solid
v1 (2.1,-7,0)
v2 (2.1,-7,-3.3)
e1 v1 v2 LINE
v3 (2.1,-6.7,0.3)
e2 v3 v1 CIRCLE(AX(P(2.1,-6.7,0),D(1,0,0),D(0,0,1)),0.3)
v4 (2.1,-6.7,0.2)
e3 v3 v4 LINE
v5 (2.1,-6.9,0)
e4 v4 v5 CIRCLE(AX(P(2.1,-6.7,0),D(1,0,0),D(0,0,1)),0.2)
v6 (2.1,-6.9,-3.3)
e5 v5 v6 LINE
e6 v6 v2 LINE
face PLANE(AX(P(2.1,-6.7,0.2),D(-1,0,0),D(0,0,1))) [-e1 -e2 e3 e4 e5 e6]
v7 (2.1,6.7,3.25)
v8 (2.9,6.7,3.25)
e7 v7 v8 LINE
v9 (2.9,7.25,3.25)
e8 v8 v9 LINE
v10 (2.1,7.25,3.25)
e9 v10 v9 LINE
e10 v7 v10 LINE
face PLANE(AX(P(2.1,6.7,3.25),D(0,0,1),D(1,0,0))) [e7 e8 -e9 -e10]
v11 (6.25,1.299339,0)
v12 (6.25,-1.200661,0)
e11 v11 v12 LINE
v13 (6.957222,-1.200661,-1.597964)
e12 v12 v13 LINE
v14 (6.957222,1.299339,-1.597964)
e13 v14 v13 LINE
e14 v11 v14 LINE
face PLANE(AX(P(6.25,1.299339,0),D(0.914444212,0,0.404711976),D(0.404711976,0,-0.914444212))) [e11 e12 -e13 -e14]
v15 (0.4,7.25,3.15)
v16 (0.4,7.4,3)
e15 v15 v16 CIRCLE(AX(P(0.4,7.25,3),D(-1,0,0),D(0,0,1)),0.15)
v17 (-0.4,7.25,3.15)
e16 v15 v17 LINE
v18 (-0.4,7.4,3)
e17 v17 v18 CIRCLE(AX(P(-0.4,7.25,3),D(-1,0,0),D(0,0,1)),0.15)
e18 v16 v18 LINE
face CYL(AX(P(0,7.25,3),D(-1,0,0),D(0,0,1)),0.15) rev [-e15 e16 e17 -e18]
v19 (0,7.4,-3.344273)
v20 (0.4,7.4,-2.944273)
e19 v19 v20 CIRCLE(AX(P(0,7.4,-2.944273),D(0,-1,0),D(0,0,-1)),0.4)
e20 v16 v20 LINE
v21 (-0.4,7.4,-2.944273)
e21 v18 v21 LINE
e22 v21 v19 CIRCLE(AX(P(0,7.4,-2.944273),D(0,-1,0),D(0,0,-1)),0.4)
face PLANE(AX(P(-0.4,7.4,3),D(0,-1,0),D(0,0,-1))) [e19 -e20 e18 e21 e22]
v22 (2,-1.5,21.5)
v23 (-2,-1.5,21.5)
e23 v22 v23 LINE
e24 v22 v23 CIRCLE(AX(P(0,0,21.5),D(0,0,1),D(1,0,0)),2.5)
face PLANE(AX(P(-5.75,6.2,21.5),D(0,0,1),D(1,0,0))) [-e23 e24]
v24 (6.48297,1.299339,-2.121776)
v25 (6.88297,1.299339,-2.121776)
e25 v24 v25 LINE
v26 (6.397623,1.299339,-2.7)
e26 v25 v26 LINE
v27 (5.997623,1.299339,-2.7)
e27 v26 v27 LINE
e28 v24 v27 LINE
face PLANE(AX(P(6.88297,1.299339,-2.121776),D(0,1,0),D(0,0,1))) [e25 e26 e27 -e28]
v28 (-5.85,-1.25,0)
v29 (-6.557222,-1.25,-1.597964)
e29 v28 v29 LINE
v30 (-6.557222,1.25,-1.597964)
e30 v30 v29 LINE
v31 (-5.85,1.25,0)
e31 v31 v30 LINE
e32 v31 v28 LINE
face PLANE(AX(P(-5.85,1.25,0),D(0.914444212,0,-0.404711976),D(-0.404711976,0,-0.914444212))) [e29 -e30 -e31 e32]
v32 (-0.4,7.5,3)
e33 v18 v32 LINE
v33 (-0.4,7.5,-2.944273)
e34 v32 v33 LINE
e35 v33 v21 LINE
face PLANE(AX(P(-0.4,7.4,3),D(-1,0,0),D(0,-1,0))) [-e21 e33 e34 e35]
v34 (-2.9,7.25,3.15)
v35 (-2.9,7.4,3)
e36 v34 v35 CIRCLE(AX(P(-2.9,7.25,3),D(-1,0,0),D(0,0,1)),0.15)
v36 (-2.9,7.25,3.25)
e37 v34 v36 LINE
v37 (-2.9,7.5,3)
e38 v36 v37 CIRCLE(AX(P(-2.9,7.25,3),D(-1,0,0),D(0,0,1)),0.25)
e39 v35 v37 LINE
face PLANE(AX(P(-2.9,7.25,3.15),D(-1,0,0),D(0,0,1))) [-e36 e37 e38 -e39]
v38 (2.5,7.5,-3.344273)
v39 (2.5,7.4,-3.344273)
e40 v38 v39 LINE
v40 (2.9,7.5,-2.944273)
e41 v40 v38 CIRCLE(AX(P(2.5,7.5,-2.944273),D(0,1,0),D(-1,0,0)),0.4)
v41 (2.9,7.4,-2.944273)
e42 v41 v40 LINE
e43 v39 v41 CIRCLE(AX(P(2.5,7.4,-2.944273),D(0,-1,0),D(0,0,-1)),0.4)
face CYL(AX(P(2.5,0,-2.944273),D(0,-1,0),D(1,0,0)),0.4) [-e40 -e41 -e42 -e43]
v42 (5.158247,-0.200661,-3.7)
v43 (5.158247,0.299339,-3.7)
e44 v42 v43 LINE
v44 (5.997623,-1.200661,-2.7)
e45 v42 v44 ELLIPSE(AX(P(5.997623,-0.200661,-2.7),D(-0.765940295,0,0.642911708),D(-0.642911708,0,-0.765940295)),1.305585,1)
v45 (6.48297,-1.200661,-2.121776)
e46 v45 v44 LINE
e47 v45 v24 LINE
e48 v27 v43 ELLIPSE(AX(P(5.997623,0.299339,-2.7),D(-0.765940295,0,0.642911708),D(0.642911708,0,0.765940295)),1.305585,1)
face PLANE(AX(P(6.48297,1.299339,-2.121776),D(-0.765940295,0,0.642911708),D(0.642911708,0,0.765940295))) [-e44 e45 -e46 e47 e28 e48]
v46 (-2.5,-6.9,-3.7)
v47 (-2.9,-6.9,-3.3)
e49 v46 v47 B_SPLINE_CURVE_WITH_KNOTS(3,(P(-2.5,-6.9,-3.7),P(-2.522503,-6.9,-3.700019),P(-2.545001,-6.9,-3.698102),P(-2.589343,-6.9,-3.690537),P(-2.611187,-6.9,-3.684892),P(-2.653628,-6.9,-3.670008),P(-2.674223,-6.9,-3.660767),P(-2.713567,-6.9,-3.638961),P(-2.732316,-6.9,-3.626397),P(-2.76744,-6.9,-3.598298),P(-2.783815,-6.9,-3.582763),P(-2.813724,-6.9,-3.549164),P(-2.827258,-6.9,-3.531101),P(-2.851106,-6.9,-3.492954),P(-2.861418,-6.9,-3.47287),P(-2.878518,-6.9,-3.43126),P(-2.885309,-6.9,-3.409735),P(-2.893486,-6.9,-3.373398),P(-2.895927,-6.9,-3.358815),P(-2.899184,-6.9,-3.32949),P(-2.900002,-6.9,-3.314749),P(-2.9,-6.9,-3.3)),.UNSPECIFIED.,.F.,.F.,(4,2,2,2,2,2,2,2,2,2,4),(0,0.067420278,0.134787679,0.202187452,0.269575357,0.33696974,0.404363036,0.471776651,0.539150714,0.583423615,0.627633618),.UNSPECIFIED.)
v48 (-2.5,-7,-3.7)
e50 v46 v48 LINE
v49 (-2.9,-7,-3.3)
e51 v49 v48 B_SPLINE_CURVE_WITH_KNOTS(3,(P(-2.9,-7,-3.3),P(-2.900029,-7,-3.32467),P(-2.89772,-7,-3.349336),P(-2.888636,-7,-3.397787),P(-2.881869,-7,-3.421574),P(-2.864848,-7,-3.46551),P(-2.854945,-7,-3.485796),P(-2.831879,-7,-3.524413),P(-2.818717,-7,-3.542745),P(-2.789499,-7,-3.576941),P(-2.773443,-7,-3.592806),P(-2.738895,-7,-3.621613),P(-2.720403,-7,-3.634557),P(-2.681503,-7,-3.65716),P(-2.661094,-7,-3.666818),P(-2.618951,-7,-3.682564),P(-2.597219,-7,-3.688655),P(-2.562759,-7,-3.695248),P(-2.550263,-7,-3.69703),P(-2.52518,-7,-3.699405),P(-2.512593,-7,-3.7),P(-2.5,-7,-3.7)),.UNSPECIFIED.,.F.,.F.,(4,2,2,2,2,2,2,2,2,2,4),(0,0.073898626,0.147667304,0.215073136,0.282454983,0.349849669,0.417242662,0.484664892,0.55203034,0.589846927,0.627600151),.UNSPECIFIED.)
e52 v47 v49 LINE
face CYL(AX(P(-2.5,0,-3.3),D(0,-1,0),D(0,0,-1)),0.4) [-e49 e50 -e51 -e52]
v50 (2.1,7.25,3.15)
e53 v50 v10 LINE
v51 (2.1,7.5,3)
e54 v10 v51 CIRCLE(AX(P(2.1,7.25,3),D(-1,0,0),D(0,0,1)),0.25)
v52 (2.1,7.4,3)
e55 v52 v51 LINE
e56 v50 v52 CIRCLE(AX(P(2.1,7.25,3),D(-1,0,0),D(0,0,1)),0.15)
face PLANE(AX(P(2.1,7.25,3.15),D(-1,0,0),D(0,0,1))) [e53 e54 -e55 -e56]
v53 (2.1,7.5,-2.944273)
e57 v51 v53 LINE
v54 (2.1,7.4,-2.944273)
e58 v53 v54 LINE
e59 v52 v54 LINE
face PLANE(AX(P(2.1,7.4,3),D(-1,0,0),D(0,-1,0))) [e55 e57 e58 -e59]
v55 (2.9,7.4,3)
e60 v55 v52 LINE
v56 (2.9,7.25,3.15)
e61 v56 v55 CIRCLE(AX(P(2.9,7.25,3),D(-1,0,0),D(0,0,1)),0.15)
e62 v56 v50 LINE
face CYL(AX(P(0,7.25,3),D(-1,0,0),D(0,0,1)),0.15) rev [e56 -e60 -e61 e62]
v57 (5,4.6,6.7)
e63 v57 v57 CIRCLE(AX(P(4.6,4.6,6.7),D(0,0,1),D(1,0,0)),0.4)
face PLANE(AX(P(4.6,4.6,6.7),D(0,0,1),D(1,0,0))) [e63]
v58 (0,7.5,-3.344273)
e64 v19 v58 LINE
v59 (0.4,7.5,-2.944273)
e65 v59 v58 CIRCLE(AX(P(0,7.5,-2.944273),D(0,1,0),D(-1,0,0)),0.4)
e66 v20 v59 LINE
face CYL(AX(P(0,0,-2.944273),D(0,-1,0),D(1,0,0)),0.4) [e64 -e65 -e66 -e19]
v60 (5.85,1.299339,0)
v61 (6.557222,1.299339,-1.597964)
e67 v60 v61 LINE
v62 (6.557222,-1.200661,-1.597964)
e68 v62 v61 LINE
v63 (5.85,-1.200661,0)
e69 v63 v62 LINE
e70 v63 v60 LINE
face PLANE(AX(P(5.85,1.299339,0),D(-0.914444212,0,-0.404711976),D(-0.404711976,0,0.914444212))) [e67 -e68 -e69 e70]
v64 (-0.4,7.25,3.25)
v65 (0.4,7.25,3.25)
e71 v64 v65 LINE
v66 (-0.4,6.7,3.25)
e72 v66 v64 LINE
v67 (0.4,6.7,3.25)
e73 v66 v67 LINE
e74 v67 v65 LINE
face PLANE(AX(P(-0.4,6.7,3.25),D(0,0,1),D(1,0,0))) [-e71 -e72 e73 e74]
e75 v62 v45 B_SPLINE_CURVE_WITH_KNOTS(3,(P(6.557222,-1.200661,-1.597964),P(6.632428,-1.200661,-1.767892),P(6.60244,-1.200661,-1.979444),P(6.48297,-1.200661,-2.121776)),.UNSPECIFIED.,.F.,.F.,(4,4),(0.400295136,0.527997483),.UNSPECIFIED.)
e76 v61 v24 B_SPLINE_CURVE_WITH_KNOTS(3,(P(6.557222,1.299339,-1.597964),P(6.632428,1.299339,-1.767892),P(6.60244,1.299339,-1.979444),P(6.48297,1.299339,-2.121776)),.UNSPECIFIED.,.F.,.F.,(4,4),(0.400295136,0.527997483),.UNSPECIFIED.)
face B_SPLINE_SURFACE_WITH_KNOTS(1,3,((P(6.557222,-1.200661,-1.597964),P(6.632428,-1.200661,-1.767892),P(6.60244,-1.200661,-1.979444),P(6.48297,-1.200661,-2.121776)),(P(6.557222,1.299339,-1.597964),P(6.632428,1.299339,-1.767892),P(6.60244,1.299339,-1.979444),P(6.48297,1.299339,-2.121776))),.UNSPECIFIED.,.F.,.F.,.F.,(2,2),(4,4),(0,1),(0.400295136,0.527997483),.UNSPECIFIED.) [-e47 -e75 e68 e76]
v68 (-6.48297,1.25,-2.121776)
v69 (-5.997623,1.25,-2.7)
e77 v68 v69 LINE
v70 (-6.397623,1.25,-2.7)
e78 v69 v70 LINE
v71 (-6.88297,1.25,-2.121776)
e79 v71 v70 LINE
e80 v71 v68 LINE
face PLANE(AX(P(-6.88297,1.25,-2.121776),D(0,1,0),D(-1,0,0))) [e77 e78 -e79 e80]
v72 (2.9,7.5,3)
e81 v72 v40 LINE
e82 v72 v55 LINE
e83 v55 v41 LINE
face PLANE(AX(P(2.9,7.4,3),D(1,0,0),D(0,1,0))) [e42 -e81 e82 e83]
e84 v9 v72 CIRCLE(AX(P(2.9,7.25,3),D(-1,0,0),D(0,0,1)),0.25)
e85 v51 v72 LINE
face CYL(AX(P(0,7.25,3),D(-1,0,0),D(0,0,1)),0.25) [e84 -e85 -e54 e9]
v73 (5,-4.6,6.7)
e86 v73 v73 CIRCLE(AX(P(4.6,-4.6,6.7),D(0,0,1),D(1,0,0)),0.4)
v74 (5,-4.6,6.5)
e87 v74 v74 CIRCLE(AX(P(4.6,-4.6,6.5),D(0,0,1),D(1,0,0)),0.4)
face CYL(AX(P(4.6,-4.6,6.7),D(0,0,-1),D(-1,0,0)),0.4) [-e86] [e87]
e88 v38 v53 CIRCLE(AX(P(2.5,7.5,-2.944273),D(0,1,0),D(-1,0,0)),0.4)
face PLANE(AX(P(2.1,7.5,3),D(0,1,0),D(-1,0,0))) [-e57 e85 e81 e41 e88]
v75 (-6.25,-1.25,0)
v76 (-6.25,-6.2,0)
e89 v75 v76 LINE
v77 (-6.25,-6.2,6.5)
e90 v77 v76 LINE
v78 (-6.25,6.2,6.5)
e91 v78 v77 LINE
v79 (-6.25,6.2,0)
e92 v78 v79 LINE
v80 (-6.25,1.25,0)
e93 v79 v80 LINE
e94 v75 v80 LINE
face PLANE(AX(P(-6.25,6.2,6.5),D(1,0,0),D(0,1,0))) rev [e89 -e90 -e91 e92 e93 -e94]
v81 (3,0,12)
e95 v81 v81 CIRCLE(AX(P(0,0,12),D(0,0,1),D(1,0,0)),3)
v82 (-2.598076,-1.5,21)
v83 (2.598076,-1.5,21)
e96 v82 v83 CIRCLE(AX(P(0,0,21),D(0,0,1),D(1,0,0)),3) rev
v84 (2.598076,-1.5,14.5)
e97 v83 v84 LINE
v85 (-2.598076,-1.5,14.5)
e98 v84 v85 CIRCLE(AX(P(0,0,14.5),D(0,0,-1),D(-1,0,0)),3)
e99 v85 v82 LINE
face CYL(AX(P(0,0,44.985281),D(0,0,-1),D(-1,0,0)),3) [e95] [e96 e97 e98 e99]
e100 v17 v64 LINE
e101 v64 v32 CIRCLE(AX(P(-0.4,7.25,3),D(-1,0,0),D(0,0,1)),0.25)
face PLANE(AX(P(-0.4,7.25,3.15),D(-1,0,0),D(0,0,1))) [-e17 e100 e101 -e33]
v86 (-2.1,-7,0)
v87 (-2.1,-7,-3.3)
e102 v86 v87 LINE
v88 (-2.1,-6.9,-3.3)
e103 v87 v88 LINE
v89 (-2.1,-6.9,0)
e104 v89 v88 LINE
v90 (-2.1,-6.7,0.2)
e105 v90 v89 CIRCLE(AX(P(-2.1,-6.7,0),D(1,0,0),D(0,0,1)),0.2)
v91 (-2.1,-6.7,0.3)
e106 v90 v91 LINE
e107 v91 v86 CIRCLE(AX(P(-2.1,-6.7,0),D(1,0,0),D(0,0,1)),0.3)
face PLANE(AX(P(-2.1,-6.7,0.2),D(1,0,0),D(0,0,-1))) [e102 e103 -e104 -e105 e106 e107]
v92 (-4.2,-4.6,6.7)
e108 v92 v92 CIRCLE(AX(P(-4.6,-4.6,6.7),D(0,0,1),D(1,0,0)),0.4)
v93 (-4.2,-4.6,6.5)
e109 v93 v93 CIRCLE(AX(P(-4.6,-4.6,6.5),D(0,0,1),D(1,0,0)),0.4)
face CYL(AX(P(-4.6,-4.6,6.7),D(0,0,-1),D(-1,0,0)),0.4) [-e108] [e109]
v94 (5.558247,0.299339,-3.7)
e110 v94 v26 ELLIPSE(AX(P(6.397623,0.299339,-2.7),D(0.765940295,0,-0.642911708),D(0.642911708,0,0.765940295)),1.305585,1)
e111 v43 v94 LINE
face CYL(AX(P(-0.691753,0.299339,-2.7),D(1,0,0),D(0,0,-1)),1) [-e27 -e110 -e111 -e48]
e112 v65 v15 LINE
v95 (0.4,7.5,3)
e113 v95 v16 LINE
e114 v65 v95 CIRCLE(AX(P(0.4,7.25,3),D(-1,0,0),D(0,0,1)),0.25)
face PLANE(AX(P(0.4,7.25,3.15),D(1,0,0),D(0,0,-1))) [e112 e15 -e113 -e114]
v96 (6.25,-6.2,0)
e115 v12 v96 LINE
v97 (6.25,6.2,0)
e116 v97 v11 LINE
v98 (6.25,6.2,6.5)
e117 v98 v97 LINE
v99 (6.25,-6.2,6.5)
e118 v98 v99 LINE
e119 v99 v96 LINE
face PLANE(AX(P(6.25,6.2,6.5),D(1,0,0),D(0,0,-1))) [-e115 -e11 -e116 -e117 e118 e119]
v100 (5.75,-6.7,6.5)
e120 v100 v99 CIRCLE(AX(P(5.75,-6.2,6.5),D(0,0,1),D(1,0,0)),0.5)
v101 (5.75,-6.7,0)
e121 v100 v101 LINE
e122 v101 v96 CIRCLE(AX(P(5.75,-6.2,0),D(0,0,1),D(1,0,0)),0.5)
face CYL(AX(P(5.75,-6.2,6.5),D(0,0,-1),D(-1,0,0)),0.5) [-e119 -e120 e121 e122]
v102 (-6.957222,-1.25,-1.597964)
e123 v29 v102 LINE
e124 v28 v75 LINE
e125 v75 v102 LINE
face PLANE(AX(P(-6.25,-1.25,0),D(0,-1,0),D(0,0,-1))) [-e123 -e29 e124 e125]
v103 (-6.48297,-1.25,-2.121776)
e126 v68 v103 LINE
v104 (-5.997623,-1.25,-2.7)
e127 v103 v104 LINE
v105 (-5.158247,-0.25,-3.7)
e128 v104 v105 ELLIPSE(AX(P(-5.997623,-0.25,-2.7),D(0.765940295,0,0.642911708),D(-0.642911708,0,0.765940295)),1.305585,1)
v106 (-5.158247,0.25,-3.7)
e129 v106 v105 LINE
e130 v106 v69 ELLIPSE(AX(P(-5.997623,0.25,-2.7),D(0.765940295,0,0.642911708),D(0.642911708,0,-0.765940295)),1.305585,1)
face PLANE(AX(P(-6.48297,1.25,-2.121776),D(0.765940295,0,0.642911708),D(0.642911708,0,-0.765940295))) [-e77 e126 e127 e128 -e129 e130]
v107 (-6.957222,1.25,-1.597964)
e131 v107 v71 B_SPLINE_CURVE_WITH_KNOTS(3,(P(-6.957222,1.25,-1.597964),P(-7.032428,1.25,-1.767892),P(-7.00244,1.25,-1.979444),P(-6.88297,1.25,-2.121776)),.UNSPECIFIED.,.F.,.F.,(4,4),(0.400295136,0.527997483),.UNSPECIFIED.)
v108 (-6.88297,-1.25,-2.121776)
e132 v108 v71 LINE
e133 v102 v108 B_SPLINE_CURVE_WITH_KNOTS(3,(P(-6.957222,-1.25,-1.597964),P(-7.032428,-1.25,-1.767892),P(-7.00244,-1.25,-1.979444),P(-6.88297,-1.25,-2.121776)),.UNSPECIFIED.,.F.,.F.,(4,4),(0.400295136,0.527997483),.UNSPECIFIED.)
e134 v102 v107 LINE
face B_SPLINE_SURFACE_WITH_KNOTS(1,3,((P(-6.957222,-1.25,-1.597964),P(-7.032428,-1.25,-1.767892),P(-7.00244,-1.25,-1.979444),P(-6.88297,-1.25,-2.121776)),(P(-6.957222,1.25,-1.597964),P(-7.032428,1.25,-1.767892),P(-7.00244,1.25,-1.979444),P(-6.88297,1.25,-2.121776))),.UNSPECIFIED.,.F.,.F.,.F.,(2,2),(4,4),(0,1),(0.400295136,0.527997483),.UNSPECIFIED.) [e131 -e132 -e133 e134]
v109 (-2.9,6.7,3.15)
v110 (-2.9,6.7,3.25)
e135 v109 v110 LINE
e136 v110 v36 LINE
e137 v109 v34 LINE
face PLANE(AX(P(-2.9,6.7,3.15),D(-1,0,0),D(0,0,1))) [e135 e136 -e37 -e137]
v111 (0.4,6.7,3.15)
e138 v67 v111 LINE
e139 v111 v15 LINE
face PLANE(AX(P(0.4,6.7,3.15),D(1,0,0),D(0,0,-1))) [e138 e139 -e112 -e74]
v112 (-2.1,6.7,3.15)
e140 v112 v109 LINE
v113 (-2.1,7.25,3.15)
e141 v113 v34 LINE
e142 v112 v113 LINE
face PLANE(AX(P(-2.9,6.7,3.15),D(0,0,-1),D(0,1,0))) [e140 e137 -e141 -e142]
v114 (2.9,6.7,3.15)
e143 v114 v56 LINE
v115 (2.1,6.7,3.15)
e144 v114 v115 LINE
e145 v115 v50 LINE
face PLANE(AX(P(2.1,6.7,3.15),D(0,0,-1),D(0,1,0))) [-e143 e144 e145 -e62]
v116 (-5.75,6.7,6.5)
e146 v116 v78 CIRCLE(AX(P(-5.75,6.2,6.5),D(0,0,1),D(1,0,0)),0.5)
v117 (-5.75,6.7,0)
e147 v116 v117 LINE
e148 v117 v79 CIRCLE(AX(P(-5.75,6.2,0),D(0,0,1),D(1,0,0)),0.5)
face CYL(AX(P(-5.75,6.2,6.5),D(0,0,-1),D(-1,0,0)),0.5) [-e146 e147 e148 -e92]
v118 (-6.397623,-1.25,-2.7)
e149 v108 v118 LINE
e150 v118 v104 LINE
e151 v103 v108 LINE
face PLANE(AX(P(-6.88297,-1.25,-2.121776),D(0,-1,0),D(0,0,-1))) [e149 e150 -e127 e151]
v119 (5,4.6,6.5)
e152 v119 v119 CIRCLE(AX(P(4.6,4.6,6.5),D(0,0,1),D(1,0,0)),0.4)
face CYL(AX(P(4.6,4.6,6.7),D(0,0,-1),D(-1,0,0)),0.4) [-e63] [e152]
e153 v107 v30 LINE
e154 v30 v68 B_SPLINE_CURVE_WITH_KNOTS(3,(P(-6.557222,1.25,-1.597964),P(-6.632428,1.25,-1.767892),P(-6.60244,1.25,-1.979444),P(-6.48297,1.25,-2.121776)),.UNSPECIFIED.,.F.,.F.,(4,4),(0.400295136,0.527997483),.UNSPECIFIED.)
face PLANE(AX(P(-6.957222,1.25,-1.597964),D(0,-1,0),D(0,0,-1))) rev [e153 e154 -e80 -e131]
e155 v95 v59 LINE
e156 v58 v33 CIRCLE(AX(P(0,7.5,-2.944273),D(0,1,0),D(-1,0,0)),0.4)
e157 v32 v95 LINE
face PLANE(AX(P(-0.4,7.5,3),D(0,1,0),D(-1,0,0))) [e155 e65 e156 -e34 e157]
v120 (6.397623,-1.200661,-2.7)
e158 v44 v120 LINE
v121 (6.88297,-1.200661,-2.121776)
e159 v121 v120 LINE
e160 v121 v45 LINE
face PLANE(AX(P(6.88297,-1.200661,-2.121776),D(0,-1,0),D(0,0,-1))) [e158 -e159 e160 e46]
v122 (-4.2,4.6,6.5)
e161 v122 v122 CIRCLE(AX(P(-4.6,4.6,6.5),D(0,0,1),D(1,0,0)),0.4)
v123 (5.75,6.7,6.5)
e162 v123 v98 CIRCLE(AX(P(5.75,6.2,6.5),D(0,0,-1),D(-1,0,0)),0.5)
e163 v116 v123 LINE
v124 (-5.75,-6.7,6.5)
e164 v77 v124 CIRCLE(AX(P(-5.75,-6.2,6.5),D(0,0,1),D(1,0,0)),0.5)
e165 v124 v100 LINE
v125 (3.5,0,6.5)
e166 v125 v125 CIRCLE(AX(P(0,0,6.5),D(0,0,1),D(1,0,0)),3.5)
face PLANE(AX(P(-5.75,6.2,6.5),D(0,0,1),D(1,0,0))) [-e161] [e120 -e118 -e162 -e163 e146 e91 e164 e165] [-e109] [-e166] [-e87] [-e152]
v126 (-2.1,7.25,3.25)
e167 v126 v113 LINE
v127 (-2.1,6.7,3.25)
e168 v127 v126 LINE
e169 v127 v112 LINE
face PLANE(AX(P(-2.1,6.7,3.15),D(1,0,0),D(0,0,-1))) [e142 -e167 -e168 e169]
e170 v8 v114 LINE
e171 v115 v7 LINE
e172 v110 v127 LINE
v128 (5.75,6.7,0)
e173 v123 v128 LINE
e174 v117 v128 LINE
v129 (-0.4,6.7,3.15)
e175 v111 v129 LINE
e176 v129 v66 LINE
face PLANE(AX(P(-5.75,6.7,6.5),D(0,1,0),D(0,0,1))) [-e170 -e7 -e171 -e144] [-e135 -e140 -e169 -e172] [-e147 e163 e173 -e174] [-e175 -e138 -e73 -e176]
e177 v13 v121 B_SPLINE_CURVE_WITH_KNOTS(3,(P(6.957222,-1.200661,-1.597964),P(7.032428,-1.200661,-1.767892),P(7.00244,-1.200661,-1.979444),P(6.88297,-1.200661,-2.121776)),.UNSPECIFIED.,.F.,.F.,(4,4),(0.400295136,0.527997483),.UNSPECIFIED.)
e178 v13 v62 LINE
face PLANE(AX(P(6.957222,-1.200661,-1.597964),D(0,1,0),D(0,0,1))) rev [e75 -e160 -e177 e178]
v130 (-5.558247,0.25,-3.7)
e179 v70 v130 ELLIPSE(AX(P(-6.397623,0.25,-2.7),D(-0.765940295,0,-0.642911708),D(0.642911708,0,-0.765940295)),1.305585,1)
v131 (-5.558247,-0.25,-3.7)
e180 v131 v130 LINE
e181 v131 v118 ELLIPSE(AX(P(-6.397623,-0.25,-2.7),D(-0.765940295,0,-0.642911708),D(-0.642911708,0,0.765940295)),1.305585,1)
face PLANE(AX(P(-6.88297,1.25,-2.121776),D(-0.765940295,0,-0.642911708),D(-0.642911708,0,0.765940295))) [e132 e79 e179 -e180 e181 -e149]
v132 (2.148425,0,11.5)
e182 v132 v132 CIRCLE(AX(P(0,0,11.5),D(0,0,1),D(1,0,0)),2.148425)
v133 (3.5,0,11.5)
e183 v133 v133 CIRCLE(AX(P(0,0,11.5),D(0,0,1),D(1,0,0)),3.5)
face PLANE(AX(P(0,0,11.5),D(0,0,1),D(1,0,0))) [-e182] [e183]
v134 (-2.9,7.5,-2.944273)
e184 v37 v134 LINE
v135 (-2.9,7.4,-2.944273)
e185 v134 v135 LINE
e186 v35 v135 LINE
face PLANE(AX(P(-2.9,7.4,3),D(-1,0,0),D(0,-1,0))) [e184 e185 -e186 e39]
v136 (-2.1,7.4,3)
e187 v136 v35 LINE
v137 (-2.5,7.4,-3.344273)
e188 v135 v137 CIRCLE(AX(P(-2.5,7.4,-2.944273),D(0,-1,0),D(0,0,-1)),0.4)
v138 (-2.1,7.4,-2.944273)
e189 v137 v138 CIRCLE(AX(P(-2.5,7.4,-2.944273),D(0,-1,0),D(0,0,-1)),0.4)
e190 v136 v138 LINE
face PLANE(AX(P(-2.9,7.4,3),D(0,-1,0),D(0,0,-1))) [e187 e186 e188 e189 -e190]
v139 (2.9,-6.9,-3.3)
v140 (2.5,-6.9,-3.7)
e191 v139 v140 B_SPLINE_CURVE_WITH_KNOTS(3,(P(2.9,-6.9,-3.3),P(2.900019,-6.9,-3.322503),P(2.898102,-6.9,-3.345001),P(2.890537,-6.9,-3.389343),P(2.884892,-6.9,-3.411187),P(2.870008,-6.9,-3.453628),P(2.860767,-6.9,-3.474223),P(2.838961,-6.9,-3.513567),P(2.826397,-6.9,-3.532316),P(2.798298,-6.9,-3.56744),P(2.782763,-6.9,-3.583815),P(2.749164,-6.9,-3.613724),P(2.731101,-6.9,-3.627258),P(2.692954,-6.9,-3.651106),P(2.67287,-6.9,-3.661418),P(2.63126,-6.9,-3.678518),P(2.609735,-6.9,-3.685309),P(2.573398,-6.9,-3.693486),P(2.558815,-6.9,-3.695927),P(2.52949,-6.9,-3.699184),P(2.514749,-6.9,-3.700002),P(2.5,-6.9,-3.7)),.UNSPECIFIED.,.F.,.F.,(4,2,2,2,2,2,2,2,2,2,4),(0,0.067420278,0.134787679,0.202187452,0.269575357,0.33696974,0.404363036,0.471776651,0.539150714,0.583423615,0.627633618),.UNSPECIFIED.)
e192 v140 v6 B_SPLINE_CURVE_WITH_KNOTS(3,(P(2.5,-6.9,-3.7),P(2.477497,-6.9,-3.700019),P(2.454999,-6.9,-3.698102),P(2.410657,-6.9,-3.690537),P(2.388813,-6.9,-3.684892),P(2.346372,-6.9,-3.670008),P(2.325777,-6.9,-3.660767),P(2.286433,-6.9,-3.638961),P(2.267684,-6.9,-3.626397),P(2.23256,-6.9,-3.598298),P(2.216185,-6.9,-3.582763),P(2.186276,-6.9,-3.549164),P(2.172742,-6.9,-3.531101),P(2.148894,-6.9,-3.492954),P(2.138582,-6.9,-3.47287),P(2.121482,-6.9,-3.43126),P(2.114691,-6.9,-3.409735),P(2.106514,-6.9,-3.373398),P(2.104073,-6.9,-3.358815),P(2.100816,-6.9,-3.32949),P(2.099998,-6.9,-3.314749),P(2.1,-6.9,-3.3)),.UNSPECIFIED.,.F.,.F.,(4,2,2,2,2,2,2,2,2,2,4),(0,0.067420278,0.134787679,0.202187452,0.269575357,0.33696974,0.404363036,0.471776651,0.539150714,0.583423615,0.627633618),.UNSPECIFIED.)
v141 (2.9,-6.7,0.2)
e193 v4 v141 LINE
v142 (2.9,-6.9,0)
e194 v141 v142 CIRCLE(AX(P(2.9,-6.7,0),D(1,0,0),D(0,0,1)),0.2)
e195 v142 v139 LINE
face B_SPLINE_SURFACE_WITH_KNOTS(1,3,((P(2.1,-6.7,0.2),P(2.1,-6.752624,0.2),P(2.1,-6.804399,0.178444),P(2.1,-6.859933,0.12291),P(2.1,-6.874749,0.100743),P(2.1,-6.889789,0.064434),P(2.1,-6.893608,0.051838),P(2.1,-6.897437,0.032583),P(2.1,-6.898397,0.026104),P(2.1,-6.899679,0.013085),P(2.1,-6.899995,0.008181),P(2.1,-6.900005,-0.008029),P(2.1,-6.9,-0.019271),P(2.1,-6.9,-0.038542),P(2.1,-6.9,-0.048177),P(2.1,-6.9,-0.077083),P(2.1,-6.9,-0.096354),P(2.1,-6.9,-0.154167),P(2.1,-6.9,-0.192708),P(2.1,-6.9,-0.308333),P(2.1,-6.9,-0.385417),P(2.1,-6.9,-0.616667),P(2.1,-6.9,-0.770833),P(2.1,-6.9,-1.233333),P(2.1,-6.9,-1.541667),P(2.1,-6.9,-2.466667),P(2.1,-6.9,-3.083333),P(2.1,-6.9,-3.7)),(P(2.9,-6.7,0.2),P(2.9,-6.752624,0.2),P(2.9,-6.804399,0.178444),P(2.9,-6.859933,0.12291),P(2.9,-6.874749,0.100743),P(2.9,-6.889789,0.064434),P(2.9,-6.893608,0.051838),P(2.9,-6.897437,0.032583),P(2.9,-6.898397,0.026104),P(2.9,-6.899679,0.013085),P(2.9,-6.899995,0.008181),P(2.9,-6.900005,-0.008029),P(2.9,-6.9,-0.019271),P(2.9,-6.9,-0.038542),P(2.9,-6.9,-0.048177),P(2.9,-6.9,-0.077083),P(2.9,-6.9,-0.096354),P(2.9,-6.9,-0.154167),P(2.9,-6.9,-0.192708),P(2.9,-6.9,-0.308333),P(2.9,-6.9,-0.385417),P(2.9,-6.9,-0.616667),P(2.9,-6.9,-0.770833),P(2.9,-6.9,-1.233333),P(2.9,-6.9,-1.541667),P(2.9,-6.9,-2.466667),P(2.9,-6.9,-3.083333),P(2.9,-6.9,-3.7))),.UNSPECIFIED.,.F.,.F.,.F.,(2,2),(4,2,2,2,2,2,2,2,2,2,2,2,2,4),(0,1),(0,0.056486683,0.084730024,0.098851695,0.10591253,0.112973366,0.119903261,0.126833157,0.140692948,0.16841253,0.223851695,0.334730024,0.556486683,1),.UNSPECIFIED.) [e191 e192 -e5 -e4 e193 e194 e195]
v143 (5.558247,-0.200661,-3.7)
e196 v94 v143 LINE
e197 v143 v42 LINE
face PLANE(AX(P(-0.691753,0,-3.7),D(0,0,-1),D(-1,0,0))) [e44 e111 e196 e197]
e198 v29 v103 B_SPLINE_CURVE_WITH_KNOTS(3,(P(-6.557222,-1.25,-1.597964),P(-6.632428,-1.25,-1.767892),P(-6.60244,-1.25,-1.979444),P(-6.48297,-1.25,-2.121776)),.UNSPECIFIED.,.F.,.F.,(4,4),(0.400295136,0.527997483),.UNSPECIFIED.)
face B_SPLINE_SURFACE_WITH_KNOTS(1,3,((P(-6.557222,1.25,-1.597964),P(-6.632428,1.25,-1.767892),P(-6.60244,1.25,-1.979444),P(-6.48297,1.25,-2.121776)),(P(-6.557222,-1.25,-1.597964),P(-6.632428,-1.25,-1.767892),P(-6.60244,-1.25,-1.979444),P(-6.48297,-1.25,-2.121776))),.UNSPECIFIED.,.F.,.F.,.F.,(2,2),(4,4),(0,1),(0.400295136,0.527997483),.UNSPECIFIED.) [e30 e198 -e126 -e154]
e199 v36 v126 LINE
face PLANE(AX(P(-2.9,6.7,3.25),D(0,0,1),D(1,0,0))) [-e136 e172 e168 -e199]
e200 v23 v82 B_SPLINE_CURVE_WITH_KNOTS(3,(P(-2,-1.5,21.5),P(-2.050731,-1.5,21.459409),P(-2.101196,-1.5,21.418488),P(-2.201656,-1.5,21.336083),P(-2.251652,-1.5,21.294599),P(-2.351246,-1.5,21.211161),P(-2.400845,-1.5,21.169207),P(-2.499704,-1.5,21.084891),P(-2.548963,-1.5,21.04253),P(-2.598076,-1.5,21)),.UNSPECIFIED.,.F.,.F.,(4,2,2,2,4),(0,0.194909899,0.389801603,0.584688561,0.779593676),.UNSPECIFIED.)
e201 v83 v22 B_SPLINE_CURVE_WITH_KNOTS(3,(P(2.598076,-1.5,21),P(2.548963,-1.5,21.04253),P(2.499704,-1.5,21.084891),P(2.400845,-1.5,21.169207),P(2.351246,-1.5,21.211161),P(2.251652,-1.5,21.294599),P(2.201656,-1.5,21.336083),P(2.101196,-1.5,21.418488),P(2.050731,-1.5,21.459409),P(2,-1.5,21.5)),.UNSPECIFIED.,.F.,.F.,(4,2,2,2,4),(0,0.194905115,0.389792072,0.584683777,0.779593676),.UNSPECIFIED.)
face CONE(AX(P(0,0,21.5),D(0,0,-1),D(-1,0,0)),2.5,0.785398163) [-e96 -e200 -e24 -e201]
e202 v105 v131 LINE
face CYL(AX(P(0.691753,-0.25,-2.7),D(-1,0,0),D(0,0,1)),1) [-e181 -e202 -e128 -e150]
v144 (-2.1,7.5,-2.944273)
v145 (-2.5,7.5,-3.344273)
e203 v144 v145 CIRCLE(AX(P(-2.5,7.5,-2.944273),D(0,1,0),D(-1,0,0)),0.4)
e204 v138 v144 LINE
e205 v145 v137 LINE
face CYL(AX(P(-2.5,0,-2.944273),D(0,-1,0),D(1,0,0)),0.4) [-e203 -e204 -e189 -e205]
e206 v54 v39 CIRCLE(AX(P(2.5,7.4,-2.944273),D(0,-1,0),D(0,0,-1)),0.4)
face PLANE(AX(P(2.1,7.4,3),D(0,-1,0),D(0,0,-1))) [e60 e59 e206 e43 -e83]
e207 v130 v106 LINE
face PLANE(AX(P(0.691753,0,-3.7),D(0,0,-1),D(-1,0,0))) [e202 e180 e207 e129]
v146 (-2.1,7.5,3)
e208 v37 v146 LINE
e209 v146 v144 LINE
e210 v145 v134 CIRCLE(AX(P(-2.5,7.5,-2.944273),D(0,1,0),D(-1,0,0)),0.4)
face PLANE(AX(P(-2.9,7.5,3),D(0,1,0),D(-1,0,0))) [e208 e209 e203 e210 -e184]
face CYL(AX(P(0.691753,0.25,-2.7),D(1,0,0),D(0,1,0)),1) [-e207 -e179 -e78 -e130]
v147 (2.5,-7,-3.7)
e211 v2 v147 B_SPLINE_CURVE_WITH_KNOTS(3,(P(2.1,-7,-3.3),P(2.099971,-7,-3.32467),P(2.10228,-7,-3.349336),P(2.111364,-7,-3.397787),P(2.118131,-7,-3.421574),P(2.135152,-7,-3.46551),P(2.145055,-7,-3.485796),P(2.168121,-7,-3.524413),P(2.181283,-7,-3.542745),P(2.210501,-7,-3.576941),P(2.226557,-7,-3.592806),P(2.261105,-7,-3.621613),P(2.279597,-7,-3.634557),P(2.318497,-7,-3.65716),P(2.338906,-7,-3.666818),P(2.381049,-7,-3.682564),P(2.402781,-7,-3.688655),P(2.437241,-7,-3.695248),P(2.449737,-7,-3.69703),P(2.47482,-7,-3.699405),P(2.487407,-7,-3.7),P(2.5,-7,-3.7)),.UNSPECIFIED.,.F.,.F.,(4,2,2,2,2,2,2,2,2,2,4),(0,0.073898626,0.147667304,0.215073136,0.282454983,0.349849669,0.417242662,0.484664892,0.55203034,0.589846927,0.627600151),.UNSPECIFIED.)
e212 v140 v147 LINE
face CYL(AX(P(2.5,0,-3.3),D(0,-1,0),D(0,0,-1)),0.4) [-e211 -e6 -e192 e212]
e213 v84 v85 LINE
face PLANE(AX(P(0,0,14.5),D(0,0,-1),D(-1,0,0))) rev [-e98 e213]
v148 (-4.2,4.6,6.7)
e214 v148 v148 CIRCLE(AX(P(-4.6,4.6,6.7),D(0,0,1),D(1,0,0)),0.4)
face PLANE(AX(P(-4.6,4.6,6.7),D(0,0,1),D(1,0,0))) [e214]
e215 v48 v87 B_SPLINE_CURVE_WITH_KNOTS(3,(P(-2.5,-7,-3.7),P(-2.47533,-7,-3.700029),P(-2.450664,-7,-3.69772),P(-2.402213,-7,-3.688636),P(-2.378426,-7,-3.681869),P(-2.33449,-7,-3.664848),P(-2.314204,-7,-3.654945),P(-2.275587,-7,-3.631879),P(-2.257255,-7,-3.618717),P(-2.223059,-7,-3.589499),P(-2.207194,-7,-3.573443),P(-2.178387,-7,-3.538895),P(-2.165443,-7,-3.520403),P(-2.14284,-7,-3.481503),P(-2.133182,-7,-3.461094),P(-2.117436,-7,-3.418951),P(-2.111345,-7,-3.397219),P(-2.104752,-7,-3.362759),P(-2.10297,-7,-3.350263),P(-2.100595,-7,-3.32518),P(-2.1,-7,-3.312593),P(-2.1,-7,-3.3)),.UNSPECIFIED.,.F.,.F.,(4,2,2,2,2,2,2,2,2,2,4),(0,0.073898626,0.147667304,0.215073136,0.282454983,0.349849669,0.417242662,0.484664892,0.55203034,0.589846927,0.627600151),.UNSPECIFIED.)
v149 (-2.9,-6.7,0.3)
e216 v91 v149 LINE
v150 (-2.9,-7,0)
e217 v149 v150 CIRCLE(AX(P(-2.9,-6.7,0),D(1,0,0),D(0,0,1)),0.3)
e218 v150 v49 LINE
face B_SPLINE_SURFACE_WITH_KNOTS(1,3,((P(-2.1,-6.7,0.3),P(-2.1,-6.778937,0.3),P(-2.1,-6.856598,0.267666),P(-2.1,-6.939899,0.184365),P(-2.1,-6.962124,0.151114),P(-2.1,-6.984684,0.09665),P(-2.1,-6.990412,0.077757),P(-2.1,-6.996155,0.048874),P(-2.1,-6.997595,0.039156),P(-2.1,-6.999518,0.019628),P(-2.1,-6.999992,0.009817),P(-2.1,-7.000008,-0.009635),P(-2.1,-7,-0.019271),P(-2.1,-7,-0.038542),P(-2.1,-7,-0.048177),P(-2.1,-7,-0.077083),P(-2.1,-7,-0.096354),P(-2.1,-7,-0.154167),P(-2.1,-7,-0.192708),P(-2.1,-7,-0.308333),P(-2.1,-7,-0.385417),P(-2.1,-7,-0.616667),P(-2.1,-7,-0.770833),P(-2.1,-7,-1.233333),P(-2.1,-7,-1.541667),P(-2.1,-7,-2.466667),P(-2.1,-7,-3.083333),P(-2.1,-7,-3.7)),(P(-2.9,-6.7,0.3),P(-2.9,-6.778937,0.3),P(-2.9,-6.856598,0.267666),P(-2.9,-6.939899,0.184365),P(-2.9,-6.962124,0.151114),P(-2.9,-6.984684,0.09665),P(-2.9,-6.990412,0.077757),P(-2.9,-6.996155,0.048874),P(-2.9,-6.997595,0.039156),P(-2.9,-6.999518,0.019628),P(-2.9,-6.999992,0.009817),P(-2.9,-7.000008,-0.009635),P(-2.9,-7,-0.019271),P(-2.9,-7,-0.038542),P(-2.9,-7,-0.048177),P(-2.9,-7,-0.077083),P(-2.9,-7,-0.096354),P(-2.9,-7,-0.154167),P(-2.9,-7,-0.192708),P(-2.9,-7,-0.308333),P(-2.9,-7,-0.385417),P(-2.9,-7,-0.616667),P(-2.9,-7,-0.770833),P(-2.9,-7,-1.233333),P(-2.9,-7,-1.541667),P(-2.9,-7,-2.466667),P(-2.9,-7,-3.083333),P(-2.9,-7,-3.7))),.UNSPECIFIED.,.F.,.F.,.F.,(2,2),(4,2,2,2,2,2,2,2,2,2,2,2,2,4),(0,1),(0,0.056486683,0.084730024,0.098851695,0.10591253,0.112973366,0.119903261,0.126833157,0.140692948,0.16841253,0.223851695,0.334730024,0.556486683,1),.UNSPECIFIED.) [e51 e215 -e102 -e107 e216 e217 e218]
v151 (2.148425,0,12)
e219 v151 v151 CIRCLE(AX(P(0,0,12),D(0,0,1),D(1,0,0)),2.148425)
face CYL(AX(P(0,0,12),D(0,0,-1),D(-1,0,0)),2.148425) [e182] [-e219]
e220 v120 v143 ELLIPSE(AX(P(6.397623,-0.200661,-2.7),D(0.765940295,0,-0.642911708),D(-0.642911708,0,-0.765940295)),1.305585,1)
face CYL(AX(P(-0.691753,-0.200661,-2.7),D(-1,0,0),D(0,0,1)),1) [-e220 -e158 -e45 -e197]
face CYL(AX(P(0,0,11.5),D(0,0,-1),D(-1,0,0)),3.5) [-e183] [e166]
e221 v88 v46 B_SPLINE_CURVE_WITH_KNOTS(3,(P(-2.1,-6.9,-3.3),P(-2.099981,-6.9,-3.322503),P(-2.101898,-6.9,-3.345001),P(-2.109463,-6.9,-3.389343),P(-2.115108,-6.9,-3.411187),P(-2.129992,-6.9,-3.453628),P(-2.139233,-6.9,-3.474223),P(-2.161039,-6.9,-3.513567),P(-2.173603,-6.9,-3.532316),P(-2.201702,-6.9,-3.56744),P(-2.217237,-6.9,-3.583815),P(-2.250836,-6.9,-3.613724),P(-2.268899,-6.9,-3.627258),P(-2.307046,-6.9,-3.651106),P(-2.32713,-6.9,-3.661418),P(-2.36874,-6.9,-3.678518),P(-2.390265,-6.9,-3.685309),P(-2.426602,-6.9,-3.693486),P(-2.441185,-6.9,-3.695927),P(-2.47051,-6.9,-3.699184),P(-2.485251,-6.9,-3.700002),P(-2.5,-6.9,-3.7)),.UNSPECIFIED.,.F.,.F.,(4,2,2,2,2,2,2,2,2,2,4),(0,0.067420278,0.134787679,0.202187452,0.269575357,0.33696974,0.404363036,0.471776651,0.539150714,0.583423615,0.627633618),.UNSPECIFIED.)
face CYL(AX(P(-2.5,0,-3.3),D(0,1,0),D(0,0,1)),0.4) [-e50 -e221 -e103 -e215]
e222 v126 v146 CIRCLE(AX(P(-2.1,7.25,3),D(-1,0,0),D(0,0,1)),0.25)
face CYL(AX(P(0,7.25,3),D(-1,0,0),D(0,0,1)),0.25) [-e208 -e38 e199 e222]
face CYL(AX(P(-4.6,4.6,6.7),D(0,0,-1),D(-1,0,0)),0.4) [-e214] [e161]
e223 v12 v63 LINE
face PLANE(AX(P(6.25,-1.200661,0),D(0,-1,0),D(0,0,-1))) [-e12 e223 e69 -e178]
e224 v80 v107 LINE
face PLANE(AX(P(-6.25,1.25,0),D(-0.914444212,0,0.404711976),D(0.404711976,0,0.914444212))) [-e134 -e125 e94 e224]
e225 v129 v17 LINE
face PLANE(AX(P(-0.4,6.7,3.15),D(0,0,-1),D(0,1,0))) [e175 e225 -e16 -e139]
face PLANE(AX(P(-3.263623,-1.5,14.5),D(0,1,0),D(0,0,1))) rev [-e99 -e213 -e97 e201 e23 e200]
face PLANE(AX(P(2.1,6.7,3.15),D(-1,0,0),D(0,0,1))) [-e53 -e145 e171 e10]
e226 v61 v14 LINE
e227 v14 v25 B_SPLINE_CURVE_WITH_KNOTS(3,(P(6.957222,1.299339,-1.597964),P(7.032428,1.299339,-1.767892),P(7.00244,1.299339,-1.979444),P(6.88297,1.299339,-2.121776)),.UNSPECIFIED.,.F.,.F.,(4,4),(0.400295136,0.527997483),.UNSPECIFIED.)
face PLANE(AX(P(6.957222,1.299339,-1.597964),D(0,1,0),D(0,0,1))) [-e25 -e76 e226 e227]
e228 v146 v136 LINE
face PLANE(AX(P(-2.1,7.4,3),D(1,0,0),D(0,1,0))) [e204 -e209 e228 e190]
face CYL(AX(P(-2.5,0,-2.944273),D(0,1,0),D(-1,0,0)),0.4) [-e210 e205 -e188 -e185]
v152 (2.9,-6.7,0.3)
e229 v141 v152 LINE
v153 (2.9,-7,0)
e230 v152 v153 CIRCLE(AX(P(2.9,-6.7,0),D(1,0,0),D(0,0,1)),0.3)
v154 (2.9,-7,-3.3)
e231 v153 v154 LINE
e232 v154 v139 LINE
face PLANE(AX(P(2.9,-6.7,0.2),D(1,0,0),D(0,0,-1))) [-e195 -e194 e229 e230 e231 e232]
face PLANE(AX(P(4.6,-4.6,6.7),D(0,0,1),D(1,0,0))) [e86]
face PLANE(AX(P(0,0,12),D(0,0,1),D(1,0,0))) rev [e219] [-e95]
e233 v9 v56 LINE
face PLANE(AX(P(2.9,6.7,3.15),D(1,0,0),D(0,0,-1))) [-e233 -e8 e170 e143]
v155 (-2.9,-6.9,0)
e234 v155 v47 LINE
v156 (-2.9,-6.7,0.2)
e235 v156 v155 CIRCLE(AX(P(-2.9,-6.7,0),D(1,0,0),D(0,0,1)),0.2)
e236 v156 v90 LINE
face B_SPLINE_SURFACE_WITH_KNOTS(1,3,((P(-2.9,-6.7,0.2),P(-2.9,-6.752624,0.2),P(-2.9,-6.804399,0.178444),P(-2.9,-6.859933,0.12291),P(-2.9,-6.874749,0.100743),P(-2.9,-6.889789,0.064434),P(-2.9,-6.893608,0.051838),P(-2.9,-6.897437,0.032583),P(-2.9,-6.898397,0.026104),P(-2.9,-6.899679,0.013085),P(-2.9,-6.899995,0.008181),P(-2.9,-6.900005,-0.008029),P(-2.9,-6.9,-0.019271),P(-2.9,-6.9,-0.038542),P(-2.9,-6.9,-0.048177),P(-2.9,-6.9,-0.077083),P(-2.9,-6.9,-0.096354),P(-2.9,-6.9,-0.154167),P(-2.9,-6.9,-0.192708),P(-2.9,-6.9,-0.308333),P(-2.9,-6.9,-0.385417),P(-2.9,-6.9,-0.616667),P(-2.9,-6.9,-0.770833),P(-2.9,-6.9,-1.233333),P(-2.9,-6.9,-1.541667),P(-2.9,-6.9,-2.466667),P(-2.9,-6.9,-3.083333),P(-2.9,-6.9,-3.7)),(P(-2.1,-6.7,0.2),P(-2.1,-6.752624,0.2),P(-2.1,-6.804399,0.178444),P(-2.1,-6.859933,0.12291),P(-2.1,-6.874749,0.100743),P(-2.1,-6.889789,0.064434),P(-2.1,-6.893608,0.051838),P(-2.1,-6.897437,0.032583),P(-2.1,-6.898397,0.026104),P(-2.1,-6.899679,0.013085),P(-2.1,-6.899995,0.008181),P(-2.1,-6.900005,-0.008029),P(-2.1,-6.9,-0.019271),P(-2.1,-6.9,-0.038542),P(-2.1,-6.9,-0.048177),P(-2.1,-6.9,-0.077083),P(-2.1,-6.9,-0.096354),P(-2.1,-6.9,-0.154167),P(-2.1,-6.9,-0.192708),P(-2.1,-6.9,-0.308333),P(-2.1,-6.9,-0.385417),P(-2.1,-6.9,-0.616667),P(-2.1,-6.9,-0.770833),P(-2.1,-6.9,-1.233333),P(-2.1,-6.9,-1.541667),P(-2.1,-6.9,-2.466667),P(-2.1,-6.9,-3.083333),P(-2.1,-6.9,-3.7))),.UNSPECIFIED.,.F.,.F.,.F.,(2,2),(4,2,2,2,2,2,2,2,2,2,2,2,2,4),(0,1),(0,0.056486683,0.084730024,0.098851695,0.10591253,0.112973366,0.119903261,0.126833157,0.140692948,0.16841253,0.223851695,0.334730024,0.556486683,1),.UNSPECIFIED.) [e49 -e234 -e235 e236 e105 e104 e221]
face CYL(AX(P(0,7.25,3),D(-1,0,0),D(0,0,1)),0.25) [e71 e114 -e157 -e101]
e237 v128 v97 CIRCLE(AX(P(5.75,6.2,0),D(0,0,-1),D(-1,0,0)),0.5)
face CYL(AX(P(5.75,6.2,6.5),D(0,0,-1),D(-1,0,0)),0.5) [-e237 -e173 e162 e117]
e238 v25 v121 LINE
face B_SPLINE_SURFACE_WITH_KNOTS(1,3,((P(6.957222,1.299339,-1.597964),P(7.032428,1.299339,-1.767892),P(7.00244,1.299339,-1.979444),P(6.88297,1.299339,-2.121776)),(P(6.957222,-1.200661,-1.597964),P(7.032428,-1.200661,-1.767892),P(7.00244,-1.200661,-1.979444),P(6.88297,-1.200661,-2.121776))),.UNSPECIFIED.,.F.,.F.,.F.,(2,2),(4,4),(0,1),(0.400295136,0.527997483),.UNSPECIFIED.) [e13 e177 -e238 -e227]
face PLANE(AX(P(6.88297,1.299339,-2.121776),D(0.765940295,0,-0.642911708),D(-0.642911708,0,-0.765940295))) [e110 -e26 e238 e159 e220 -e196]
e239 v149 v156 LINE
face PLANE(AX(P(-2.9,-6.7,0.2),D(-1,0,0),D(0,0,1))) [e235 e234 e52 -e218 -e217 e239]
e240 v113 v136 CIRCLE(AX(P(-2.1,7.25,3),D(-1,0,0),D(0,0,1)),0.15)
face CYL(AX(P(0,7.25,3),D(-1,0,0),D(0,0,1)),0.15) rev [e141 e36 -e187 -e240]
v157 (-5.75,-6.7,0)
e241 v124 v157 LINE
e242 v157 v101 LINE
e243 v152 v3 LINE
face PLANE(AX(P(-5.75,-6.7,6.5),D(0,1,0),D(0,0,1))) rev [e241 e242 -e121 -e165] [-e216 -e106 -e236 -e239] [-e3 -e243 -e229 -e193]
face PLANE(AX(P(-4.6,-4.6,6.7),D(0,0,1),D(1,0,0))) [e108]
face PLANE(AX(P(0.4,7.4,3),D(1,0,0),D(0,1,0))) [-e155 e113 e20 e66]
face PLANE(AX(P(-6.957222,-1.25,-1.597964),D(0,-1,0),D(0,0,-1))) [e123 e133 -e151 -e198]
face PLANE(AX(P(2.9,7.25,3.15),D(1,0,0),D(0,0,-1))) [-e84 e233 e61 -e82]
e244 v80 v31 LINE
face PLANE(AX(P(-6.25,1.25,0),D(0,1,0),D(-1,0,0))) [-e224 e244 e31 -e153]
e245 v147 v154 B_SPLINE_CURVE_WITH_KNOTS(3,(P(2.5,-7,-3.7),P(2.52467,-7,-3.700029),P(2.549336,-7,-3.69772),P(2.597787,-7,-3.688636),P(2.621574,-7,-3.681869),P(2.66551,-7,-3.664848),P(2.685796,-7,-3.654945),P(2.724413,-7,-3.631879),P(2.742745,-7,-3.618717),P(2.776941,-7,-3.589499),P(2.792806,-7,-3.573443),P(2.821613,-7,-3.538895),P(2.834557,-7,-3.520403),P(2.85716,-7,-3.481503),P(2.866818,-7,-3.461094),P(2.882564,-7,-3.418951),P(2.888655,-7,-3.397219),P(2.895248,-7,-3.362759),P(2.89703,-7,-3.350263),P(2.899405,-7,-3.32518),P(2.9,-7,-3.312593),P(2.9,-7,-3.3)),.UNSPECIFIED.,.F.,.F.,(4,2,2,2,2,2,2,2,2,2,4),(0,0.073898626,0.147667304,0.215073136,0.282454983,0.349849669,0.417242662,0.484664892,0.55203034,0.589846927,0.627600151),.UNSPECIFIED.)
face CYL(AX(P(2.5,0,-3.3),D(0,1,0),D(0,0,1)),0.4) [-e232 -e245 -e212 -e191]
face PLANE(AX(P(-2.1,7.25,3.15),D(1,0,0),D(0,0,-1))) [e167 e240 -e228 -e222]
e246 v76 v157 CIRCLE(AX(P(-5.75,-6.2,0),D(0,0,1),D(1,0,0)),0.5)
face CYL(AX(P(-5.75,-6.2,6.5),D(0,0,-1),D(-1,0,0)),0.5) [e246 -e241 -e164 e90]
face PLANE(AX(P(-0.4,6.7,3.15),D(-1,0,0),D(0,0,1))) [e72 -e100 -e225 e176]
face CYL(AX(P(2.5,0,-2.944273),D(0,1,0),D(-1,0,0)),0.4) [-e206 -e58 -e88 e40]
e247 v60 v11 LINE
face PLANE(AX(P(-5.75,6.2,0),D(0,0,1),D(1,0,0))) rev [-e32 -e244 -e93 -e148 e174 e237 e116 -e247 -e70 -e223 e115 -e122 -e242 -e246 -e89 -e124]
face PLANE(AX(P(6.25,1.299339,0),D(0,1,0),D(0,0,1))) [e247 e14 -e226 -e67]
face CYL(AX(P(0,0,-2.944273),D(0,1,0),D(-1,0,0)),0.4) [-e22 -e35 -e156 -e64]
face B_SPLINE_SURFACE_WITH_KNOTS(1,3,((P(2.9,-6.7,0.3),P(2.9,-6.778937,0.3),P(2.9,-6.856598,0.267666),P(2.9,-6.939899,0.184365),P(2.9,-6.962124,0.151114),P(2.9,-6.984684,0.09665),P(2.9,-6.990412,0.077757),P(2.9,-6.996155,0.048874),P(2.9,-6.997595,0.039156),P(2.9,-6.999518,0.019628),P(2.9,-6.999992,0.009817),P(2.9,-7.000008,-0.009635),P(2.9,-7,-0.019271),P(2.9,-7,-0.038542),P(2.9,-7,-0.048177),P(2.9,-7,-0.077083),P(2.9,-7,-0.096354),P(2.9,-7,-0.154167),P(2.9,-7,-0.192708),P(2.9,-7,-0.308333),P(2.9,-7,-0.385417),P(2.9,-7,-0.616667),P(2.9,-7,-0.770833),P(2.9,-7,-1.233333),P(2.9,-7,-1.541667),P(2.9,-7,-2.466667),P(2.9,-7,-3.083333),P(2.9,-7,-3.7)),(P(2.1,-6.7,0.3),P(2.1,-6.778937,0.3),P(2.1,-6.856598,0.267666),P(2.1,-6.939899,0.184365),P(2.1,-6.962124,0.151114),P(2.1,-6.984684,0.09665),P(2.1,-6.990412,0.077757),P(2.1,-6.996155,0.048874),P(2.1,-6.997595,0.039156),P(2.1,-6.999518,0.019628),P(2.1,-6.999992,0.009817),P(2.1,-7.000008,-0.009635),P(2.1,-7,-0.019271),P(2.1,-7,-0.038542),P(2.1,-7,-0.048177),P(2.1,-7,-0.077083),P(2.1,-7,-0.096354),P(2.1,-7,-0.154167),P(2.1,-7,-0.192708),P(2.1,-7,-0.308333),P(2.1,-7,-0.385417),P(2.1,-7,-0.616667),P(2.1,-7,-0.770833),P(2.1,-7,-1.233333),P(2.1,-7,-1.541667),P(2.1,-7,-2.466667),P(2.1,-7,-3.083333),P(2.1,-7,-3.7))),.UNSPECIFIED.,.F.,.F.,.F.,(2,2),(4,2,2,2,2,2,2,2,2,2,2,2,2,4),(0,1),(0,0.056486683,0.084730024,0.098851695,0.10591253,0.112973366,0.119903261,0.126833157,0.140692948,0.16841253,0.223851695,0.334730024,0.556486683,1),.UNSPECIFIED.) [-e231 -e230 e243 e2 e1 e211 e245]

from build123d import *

# Parameters (mm, degrees)
EXTRUDE_1_DEPTH     = 6.5
SKETCH_2_R          = 0.4
EXTRUDE_2_DEPTH     = 0.2
SKETCH_3_R          = 3.5
EXTRUDE_3_DEPTH     = 5
SKETCH_4_R          = 3
EXTRUDE_5_DEPTH     = 10
SKETCH_5_W          = 6.52724622
SKETCH_5_H          = 2.89226862
CUT_EXTRUDE_1_DEPTH = 7
CHAMFER_1_SIZE      = 0.5
SKETCH_6_R          = 3.145240335
SKETCH_6_R_2        = 2.148425486
CUT_EXTRUDE_2_DEPTH = 0.5
SWEEP_START         = -1.25
SWEEP_12_DEPTH      = 2.5
SWEEP_START_2       = -1.200661392
SWEEP_13_DEPTH      = 2.5
SKETCH_13_W         = 0.8
SKETCH_13_H         = 0.1
SKETCH_14_W         = 0.8
SKETCH_14_H         = 0.1
FILLET_1_R          = 0.4
FILLET_2_R          = 1


# Read off the part's stored shape, not the designer's step: По траектории12, По траектории13
# Some blends are built 0.0001 mm under size
with BuildPart() as part:
    # Эскиз1 → Бобышка-Вытянуть1 (new body)
    with BuildSketch(Plane.XY):
        with BuildLine():
            Line((-5.75, 6.7), (5.75, 6.7))
            ThreePointArc((5.75, 6.7), (6.103553391, 6.553553391), (6.25, 6.2))
            Line((6.25, 6.2), (6.25, -6.2))
            ThreePointArc((6.25, -6.2), (6.103553391, -6.553553391), (5.75, -6.7))
            Line((5.75, -6.7), (-5.75, -6.7))
            ThreePointArc((-5.75, -6.7), (-6.103553391, -6.553553391), (-6.25, -6.2))
            Line((-6.25, -6.2), (-6.25, 6.2))
            ThreePointArc((-6.25, 6.2), (-6.103553391, 6.553553391), (-5.75, 6.7))
        make_face()
    extrude(amount=EXTRUDE_1_DEPTH)

    # Эскиз2 → Бобышка-Вытянуть2 (add)
    with BuildSketch(Plane.XY.offset(6.5)):
        with Locations((-4.6, 4.6)):
            Circle(SKETCH_2_R)
        with Locations((4.6, 4.6)):
            Circle(SKETCH_2_R)
        with Locations((4.6, -4.6)):
            Circle(SKETCH_2_R)
        with Locations((-4.6, -4.6)):
            Circle(SKETCH_2_R)
    extrude(amount=EXTRUDE_2_DEPTH)

    # Эскиз3 → Бобышка-Вытянуть3 (add)
    with BuildSketch(Plane.XY.offset(6.5)):
        Circle(SKETCH_3_R)
    extrude(amount=EXTRUDE_3_DEPTH)

    # Эскиз4 → Бобышка-Вытянуть5 (add)
    with BuildSketch(Plane.XY.offset(11.5)):
        Circle(SKETCH_4_R)
    extrude(amount=EXTRUDE_5_DEPTH)

    # Эскиз5 → Вырез-Вытянуть1 (cut)
    with BuildSketch(Plane.XY.offset(21.5)):
        with Locations((0, -2.94613431)):
            Rectangle(SKETCH_5_W, SKETCH_5_H)
    extrude(amount=-CUT_EXTRUDE_1_DEPTH, mode=Mode.SUBTRACT)

    # Фаска1
    chamfer_1_edges = [part.edges().sort_by_distance(p)[0] for p in [
        (-0.776457135, 2.897777479, 21.5),
    ]]
    chamfer(chamfer_1_edges, length=CHAMFER_1_SIZE)

    # Эскиз6 → Вырез-Вытянуть2 (cut)
    with BuildSketch(Plane.XY.offset(11.5)):
        Circle(SKETCH_6_R)
        Circle(SKETCH_6_R_2, mode=Mode.SUBTRACT)
    extrude(amount=CUT_EXTRUDE_2_DEPTH, mode=Mode.SUBTRACT)

    # По траектории12 outline → По траектории12 (add)
    with BuildSketch(Plane(origin=(0, 0, 0), x_dir=(1, 0, 0), z_dir=(0, 1, 0)).offset(SWEEP_START)):
        with BuildLine():
            Line((-5.85, 0), (-6.557222106, 1.597963985))
            add(Edge.make_bspline(
                [(-6.557222106, 1.597963985), (-6.632428218, 1.767891731), (-6.602440024, 1.979444008), (-6.482970147, 2.121775827)],
                knots=[0.400295136, 0.400295136, 0.400295136, 0.400295136, 0.527997483, 0.527997483, 0.527997483, 0.527997483], degree=3))
            Line((-6.482970147, 2.121775827), (-5.158247051, 3.7))
            Line((-5.158247051, 3.7), (-5.558247051, 3.7))
            Line((-5.558247051, 3.7), (-6.882970147, 2.121775827))
            add(Edge.make_bspline(
                [(-6.957222106, 1.597963985), (-7.032428218, 1.767891731), (-7.002440024, 1.979444008), (-6.882970147, 2.121775827)],
                knots=[0.400295136, 0.400295136, 0.400295136, 0.400295136, 0.527997483, 0.527997483, 0.527997483, 0.527997483], degree=3))
            Line((-6.957222106, 1.597963985), (-6.25, 0))
            Line((-6.25, 0), (-5.85, 0))
        make_face()
    extrude(amount=SWEEP_12_DEPTH)

    # По траектории13 outline → По траектории13 (add)
    with BuildSketch(Plane(origin=(0, 0, 0), x_dir=(1, 0, 0), z_dir=(0, 1, 0)).offset(SWEEP_START_2)):
        with BuildLine():
            Line((6.25, 0), (6.957222106, 1.597963985))
            add(Edge.make_bspline(
                [(6.957222106, 1.597963985), (7.032428218, 1.767891731), (7.002440024, 1.979444008), (6.882970147, 2.121775827)],
                knots=[0.400295136, 0.400295136, 0.400295136, 0.400295136, 0.527997483, 0.527997483, 0.527997483, 0.527997483], degree=3))
            Line((6.882970147, 2.121775827), (5.558247051, 3.7))
            Line((5.558247051, 3.7), (5.158247051, 3.7))
            Line((5.158247051, 3.7), (6.482970147, 2.121775827))
            add(Edge.make_bspline(
                [(6.557222106, 1.597963985), (6.632428218, 1.767891731), (6.602440024, 1.979444008), (6.482970147, 2.121775827)],
                knots=[0.400295136, 0.400295136, 0.400295136, 0.400295136, 0.527997483, 0.527997483, 0.527997483, 0.527997483], degree=3))
            Line((6.557222106, 1.597963985), (5.85, 0))
            Line((5.85, 0), (6.25, 0))
        make_face()
    extrude(amount=SWEEP_13_DEPTH)

    # По траектории14: sweep along a path in Эскиз15
    with BuildLine(Plane(origin=(0, 0, 0), x_dir=(0, 0, -1), z_dir=(1, 0, 0))) as sweep_14_path:
        Line((3.7, -7), (0, -7))
        ThreePointArc((0, -7), (-0.212132034, -6.912132034), (-0.3, -6.7))
    # Эскиз13 → По траектории14 (sweep)
    with BuildSketch(Plane(origin=(0, 0, 0), x_dir=(-1, 0, 0), z_dir=(0, 0, -1))):
        with Locations((2.5, -6.95)):
            Rectangle(SKETCH_13_W, SKETCH_13_H)
        with Locations((-2.5, -6.95)):
            Rectangle(SKETCH_13_W, SKETCH_13_H)
    sweep(path=sweep_14_path.line)

    # По траектории15: sweep along a path in Эскиз16
    with BuildLine(Plane(origin=(0, 0, 0), x_dir=(0, 0, -1), z_dir=(1, 0, 0))) as sweep_15_path:
        Line((3.344273236, 7.5), (0, 7.5))
        Line((0, 7.5), (-3, 7.5))
        ThreePointArc((-3, 7.5), (-3.176776695, 7.426776695), (-3.25, 7.25))
        Line((-3.25, 7.25), (-3.25, 6.7))
    # Эскиз14 → По траектории15 (sweep)
    with BuildSketch(Plane(origin=(0, 0, 0), x_dir=(-1, 0, 0), z_dir=(0, 0, -1))):
        with Locations((2.5, 7.45)):
            Rectangle(SKETCH_14_W, SKETCH_14_H)
        with Locations((0, 7.45)):
            Rectangle(SKETCH_14_W, SKETCH_14_H)
        with Locations((-2.5, 7.45)):
            Rectangle(SKETCH_14_W, SKETCH_14_H)
    sweep(path=sweep_15_path.line)

    # Скругление1
    fillet_1_edges = [part.edges().sort_by_distance(p)[0] for p in [
        (-2.9, -6.95, -3.7),
        (-2.1, -6.95, -3.7),
        (2.1, -6.95, -3.7),
        (2.9, -6.95, -3.7),
        (-2.9, 7.45, -3.344273236),
        (-2.1, 7.45, -3.344273236),
        (0.4, 7.45, -3.344273236),
        (-0.4, 7.45, -3.344273236),
        (2.1, 7.45, -3.344273236),
        (2.9, 7.45, -3.344273236),
    ]]
    fillet(fillet_1_edges, radius=FILLET_1_R - 0.0001)  # a hair under: the kernel refuses the full size

    # Скругление2
    # the kernel refuses this fillet: 1 mm, written as the material it takes off along each edge
    with BuildSketch(Plane(origin=(8.058247051, -1.200661392, -3.7), x_dir=(0, 0, 1), z_dir=(-1, 0, 0)), Plane(origin=(-2.658247051, -1.25, -3.7), x_dir=(0, 0, 1), z_dir=(-1, 0, 0))) as fillet_2_piece_1:
        with BuildLine():
            CenterArc((FILLET_2_R, FILLET_2_R), FILLET_2_R, 180, 90)
            Line((0, FILLET_2_R), (0, 0))
            Line((0, 0), (FILLET_2_R, 0))
        make_face()
    extrude(amount=5.4, mode=Mode.SUBTRACT)
    with BuildSketch(Plane(origin=(8.058247051, 1.299338608, -3.7), x_dir=(0, 0, 1), z_dir=(-1, 0, 0)), Plane(origin=(-2.658247051, 1.25, -3.7), x_dir=(0, 0, 1), z_dir=(-1, 0, 0))) as fillet_2_piece_2:
        with BuildLine():
            CenterArc((FILLET_2_R, -FILLET_2_R), FILLET_2_R, 90, 90)
            Line((0, -FILLET_2_R), (0, 0))
            Line((0, 0), (FILLET_2_R, 0))
        make_face()
    extrude(amount=5.4, mode=Mode.SUBTRACT)


solid = part.part
